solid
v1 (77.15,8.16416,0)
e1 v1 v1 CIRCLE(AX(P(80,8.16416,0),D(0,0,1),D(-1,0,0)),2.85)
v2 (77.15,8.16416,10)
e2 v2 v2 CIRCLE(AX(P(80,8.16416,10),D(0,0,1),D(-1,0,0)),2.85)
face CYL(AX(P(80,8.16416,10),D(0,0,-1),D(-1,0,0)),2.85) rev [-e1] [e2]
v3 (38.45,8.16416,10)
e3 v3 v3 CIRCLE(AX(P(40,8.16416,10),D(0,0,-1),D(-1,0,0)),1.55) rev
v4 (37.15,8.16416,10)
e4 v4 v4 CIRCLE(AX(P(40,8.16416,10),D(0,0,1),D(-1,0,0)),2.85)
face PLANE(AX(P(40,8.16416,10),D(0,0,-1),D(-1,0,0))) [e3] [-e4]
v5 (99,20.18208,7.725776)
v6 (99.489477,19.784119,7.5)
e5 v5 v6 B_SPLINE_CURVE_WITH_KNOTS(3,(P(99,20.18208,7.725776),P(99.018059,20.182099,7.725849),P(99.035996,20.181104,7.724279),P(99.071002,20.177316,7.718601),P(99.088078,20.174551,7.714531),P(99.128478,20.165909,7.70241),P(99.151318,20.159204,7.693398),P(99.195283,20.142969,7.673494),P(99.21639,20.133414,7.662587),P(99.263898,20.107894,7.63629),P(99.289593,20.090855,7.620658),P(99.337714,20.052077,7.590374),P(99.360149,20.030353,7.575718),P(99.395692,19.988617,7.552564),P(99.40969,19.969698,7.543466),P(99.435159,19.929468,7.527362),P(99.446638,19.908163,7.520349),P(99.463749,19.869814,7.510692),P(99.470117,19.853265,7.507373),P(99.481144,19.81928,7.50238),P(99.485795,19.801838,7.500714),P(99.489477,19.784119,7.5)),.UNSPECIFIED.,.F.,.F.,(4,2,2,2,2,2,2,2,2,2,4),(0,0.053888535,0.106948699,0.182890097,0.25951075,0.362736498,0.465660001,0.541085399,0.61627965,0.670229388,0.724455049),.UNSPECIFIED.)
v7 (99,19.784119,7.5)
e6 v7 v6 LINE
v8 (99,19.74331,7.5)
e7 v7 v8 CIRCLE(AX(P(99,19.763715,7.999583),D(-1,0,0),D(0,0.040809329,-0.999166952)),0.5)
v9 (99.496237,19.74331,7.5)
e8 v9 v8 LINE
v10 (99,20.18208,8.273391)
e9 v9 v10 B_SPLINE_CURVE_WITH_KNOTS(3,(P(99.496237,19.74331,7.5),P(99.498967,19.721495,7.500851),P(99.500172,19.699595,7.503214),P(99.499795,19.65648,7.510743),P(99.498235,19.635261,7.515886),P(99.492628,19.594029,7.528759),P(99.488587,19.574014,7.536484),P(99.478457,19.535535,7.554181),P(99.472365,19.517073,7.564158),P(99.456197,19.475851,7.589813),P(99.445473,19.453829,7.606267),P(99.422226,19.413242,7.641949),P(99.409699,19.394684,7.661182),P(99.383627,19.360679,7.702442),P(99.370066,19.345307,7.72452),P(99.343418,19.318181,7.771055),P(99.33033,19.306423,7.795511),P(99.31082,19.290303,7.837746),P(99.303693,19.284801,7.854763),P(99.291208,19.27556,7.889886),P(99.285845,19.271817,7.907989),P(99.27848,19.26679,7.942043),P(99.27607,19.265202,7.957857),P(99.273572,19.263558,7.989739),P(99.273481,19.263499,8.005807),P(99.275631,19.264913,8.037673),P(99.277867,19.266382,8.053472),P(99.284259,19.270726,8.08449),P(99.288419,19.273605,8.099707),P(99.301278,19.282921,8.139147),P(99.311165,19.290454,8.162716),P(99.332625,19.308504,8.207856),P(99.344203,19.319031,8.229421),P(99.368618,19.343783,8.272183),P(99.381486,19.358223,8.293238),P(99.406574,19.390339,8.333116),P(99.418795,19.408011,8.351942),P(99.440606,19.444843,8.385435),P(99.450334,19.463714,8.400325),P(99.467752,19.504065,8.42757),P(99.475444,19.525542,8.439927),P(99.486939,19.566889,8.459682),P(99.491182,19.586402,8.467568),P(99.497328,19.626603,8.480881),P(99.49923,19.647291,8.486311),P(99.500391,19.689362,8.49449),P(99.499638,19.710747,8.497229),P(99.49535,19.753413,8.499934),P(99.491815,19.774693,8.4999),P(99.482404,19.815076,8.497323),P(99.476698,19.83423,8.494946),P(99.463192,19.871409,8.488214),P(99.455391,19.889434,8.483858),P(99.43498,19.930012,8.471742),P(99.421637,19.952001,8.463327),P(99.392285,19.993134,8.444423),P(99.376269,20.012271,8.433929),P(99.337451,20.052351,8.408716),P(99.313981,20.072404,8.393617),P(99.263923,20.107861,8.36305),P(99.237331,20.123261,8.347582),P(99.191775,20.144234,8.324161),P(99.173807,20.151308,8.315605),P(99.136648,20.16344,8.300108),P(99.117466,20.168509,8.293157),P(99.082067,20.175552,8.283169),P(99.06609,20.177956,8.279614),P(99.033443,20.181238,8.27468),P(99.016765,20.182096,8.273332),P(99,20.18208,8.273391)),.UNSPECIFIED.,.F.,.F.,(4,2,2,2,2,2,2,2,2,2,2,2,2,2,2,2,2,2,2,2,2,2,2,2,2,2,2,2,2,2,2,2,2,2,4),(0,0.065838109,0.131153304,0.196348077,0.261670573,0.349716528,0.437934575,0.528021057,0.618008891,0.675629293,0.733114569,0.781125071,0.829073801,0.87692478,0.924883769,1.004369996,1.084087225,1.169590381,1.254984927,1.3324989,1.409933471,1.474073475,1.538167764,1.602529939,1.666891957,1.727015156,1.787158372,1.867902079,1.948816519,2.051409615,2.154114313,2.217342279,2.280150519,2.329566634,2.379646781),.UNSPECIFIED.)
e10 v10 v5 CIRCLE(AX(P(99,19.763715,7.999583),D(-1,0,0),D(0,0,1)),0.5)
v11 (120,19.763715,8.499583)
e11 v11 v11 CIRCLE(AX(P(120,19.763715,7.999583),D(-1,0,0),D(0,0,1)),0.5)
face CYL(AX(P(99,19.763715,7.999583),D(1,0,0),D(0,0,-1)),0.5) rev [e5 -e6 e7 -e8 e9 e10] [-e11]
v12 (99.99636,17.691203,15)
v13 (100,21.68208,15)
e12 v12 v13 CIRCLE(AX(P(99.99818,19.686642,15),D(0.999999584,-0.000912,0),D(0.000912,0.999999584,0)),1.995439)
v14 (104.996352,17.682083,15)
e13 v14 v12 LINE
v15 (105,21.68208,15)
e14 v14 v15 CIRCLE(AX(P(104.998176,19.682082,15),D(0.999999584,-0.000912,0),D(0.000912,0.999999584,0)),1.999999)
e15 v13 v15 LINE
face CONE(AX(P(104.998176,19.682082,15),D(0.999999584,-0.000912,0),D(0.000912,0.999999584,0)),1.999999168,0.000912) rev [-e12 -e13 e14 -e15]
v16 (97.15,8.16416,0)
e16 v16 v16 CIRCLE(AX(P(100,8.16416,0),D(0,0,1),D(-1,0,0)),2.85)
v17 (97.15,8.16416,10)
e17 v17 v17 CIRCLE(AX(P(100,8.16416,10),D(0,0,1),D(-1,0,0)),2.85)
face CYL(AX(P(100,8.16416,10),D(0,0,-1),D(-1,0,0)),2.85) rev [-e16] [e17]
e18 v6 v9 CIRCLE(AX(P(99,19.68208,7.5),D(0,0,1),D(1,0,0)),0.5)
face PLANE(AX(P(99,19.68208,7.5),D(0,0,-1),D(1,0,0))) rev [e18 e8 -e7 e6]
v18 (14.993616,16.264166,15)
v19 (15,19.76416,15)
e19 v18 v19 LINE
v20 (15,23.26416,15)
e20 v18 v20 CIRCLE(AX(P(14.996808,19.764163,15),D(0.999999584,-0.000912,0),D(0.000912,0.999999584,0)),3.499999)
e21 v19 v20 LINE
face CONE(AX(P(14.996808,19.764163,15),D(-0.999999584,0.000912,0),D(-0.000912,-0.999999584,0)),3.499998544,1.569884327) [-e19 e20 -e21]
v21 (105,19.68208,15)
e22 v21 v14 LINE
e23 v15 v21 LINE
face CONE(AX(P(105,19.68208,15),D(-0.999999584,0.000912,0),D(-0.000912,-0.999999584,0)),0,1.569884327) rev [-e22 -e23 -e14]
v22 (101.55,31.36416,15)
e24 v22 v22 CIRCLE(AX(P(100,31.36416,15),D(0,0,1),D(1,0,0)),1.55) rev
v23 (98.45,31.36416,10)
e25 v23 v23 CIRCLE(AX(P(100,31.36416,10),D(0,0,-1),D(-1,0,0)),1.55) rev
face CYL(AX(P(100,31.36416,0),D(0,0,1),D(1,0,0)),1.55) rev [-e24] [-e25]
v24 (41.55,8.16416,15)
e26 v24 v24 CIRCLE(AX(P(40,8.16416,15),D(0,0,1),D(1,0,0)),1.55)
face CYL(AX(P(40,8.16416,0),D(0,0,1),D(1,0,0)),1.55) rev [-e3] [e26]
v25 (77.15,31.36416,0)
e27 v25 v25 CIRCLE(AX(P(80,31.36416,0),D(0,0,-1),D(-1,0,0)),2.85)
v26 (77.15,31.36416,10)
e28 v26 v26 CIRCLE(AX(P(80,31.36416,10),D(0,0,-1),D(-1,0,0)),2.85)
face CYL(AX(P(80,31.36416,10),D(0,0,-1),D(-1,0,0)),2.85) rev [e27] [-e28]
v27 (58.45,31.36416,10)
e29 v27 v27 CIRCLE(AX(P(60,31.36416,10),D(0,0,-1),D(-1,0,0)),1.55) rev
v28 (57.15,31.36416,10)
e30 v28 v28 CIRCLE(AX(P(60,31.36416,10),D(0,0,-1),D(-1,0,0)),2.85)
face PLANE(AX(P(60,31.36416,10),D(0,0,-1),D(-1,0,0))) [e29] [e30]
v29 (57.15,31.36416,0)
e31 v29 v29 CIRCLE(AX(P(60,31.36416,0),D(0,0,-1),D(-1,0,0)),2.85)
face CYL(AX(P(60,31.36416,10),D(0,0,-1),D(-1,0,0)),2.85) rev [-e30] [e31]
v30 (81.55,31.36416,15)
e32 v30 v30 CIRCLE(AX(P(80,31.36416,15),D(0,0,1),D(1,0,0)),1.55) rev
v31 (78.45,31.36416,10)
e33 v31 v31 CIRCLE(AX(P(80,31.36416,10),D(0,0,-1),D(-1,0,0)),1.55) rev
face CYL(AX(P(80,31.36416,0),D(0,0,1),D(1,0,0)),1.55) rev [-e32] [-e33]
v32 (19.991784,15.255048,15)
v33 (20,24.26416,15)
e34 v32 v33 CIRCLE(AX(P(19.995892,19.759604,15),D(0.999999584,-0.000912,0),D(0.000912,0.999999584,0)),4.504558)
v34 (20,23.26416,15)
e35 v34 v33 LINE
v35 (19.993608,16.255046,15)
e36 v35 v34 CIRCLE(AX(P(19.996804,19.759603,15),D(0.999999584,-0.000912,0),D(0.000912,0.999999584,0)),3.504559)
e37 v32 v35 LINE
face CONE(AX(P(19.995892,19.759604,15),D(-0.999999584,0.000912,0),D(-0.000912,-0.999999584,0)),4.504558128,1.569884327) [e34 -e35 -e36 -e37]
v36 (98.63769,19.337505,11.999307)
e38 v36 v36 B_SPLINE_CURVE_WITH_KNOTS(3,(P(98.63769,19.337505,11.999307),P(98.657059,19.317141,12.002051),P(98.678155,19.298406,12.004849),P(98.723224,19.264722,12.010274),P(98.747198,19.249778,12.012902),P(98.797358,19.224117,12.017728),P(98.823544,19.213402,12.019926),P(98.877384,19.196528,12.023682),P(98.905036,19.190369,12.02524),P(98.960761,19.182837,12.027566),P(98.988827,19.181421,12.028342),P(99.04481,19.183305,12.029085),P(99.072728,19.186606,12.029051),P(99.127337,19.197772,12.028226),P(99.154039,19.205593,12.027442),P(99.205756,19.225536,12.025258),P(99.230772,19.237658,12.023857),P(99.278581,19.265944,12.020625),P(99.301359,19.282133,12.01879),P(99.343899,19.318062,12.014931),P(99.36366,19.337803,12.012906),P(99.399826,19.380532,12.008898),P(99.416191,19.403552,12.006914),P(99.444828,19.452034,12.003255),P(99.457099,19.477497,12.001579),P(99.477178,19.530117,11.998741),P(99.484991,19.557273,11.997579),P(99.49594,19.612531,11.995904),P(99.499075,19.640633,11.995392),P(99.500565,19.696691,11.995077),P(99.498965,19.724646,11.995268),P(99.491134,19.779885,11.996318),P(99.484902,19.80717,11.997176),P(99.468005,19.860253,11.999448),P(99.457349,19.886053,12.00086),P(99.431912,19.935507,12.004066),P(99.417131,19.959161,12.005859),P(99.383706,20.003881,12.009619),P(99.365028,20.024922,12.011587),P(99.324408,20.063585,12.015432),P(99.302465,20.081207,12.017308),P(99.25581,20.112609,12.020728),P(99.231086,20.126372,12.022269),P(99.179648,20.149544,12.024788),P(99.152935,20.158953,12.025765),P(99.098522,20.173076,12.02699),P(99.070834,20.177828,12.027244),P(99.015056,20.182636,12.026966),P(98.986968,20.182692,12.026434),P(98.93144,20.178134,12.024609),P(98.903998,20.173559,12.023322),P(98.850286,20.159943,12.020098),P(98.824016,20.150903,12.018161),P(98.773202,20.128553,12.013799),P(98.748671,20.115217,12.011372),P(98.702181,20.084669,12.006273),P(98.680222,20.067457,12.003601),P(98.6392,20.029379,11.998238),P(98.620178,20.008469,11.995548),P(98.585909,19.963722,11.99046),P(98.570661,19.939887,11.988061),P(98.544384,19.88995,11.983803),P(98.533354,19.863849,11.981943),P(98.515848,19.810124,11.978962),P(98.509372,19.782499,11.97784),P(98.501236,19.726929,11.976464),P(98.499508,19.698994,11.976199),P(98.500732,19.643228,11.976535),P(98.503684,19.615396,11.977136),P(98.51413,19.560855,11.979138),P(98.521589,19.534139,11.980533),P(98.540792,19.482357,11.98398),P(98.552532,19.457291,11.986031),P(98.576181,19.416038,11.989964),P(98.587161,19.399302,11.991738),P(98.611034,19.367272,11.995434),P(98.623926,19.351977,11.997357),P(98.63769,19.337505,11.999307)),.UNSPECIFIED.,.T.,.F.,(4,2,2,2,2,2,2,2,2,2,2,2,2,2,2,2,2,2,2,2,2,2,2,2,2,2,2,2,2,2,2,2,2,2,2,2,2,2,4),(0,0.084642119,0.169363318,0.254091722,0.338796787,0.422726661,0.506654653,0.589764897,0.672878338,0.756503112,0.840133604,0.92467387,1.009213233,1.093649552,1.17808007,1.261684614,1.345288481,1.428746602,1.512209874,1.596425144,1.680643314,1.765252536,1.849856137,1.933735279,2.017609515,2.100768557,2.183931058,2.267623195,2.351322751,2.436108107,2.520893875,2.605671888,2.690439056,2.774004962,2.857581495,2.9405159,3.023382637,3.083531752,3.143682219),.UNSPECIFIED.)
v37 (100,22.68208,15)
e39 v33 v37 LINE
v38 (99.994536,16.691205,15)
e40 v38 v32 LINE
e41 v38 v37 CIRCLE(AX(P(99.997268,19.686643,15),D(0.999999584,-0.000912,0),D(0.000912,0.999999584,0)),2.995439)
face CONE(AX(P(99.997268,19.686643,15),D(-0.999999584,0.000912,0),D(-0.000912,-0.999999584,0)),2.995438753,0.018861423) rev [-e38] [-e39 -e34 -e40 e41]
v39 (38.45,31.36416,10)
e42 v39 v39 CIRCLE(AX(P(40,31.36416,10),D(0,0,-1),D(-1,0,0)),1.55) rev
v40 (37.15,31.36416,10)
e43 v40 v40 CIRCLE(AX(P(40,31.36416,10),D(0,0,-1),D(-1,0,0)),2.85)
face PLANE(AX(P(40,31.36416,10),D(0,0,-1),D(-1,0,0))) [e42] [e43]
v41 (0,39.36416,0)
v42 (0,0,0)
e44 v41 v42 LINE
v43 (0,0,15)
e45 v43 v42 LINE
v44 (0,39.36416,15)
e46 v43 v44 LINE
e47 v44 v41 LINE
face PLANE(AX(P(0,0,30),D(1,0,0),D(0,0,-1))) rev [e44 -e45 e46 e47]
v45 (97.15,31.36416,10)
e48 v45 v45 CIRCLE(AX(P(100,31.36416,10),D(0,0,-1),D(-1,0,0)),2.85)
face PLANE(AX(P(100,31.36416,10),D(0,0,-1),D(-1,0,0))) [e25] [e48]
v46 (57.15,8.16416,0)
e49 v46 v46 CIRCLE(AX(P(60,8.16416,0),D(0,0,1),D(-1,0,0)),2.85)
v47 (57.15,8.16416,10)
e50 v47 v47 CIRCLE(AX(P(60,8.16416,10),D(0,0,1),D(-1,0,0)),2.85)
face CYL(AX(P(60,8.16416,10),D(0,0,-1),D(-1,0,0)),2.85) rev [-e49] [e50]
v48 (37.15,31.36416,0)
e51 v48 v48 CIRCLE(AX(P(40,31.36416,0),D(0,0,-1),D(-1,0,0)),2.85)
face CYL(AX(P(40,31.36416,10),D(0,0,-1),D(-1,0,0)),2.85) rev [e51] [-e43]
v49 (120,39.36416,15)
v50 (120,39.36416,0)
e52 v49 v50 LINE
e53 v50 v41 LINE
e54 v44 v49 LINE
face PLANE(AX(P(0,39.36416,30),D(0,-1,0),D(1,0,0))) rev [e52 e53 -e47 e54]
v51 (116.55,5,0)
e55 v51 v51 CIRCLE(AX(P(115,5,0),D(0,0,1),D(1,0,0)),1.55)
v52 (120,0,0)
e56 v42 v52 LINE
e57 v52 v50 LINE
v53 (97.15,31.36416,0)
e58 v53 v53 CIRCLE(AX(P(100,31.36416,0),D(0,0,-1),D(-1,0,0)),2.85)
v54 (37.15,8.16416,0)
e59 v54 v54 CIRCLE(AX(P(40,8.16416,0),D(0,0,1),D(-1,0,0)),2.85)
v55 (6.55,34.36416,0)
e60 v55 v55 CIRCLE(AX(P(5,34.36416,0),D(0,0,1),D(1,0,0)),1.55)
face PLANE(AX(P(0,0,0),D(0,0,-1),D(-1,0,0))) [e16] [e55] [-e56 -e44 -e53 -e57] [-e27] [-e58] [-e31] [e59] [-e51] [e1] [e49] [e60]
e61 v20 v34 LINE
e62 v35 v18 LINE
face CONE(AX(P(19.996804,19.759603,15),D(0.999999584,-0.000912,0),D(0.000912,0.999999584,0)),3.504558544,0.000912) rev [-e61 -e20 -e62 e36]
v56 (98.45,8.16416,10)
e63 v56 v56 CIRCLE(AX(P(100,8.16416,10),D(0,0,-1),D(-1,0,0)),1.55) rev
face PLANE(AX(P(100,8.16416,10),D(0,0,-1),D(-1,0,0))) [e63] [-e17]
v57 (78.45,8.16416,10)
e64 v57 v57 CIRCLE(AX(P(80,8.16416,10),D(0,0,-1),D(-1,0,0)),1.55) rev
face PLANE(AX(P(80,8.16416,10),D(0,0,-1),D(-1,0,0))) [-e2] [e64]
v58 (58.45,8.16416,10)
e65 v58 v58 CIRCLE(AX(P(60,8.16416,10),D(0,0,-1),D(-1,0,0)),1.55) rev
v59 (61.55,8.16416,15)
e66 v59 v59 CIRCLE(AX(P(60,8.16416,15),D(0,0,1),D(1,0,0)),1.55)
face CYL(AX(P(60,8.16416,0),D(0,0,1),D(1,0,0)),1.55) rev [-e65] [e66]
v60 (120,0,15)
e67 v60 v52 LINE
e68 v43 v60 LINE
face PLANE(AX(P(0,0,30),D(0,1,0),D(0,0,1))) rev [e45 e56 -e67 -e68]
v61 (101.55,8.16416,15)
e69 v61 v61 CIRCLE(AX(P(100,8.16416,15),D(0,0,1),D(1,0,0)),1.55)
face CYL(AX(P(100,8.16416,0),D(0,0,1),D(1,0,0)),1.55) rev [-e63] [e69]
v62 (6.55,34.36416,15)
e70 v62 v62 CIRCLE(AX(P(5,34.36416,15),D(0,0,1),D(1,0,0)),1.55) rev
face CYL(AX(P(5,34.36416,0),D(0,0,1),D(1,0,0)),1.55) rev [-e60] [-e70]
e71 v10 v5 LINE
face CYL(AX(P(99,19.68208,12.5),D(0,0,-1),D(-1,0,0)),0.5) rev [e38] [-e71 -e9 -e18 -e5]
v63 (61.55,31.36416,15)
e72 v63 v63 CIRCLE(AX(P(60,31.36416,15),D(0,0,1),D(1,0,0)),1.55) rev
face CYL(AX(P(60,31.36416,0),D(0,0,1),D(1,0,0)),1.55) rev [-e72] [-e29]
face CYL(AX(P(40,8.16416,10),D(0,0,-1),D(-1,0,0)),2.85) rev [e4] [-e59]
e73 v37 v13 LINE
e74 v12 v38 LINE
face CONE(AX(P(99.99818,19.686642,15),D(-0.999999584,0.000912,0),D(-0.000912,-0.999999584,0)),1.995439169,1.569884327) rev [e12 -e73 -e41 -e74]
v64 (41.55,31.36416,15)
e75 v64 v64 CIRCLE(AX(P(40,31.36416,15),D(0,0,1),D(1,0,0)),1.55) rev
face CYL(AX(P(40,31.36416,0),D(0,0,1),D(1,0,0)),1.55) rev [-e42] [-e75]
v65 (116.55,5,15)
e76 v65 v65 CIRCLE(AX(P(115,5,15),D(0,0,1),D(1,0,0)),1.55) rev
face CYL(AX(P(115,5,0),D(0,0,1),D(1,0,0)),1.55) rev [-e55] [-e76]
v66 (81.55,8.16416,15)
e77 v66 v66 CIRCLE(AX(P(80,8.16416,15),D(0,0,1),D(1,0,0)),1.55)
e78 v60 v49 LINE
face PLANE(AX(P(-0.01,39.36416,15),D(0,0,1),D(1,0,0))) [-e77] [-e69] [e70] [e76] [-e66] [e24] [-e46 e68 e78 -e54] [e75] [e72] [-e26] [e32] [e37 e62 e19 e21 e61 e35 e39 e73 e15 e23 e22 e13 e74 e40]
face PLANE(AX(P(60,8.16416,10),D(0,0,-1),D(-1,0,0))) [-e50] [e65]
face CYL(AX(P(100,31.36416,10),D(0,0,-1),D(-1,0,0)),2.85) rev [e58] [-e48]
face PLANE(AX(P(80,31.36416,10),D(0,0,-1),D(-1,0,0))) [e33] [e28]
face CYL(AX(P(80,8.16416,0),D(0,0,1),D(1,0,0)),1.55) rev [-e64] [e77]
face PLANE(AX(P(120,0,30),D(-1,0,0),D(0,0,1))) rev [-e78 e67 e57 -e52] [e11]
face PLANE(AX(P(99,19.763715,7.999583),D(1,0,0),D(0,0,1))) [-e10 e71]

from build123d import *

# Parameters (mm, degrees)
SKIZZE2_W                        = 120
SKIZZE2_H                        = 39.364160046
AUFSATZ_LINEAR_AUSTRAGEN1_DEPTH  = 30
SKIZZE24_R                       = 1.55
SCHNITT_LINEAR_AUSTRAGEN4_DEPTH  = 130.805766806
SKIZZE46_R                       = 2.85
SCHNITT_LINEAR_AUSTRAGEN15_DEPTH = 10
SCHNITT_LINEAR_START             = -5
SCHNITT_LINEAR_AUSTRAGEN25_DEPTH = 2.7
LINEARES_MUSTER1_COUNT           = 4
LINEARES_MUSTER1_PITCH           = 20
SPIEGELN2_COPY_1_SKETCH_R        = 2.85
SPIEGELN2_COPY_1_DEPTH           = 10
SPIEGELN2_COPY_2_SKETCH_R        = 2.85
SPIEGELN2_COPY_2_DEPTH           = 10
SPIEGELN2_COPY_3_SKETCH_R        = 2.85
SPIEGELN2_COPY_3_DEPTH           = 10
SPIEGELN2_START                  = -5
SPIEGELN2_COPY_4_DEPTH           = 2.7
SPIEGELN2_COPY_5_DEPTH           = 2.7
SPIEGELN2_COPY_6_DEPTH           = 2.7
SKIZZE51_R                       = 1.55
SCHNITT_LINEAR_AUSTRAGEN26_DEPTH = 130.805766806
SKIZZE75_R                       = 0.75
SCHNITT_LINEAR_AUSTRAGEN28_DEPTH = 10
SKIZZE76_R                       = 2
SCHNITT_LINEAR_AUSTRAGEN29_DEPTH = 6
SKIZZE80_R                       = 0.5
SCHNITT_LINEAR_AUSTRAGEN34_DEPTH = 21
SCHNITT_LINEAR_START_2           = -7.5
SKIZZE81_R                       = 0.5
SCHNITT_LINEAR_AUSTRAGEN36_DEPTH = 5
ABSPALTEN3_START                 = 15
ABSPALTEN3_OUTLINE_W             = 120
ABSPALTEN3_OUTLINE_H             = 39.364160046
ABSPALTEN3_OUTLINE_R             = 1.55
ABSPALTEN3_DEPTH                 = 15


# Read off the part's stored shape, not the designer's step: Abspalten3
with BuildPart() as part:
    # Skizze2 → Aufsatz-Linear austragen1 (new body)
    with BuildSketch(Plane.XY):
        with Locations((60, 19.682080023)):
            Rectangle(SKIZZE2_W, SKIZZE2_H)
    extrude(amount=AUFSATZ_LINEAR_AUSTRAGEN1_DEPTH)

    # Skizze24 → Schnitt-Linear austragen4 (cut, through all)
    with BuildSketch(Plane.XY.offset(30)):
        with Locations((40, 31.364160046)):
            Circle(SKIZZE24_R)
        with Locations((60, 31.364160046)):
            Circle(SKIZZE24_R)
        with Locations((80, 31.364160046)):
            Circle(SKIZZE24_R)
        with Locations((100, 31.364160046)):
            Circle(SKIZZE24_R)
    schnitt_linear_austragen4 = extrude(amount=-SCHNITT_LINEAR_AUSTRAGEN4_DEPTH, mode=Mode.SUBTRACT)

    # Skizze46 → Schnitt-Linear austragen15 (cut)
    with BuildSketch(Plane(origin=(0, 0, 0), x_dir=(-1, 0, 0), z_dir=(0, 0, -1))):
        with Locations((-100, 31.364160046)):
            Circle(SKIZZE46_R)
    schnitt_linear_austragen15 = extrude(amount=-SCHNITT_LINEAR_AUSTRAGEN15_DEPTH, mode=Mode.SUBTRACT)

    # Skizze50 → Schnitt-Linear austragen25 (cut)
    with BuildSketch(Plane.XY.offset(30).offset(SCHNITT_LINEAR_START)):
        Polygon((97.15, 33.009608314), (97.15, 39.364160046), (102.85, 39.364160046), (102.85, 33.009608314), (102.85, 29.718711779), (100, 28.073263512), (97.15, 29.718711779), align=None)
    schnitt_linear_austragen25 = extrude(amount=-SCHNITT_LINEAR_AUSTRAGEN25_DEPTH, mode=Mode.SUBTRACT)

    # Lineares Muster1: Schnitt-Linear austragen15, Schnitt-Linear austragen25 ×4
    with Locations(*[(-i * LINEARES_MUSTER1_PITCH, 0, 0) for i in range(1, LINEARES_MUSTER1_COUNT)]):
        add(schnitt_linear_austragen15, mode=Mode.SUBTRACT)
        add(schnitt_linear_austragen25, mode=Mode.SUBTRACT)

    # Spiegeln2: Schnitt-Linear austragen15, Schnitt-Linear austragen25 across plane
    add(schnitt_linear_austragen15.mirror(Plane.ZX.offset(19.764160046)), mode=Mode.SUBTRACT)
    add(schnitt_linear_austragen25.mirror(Plane.ZX.offset(19.764160046)), mode=Mode.SUBTRACT)

    # Spiegeln2 copy 1 sketch → Spiegeln2 copy 1 (cut)
    with BuildSketch(Plane(origin=(-20, 39.528320093, 0), x_dir=(-1, 0, 0), z_dir=(0, 0, -1))):
        with Locations((-100, -31.364160046)):
            Circle(SPIEGELN2_COPY_1_SKETCH_R)
    extrude(amount=-SPIEGELN2_COPY_1_DEPTH, mode=Mode.SUBTRACT)

    # Spiegeln2 copy 2 sketch → Spiegeln2 copy 2 (cut)
    with BuildSketch(Plane(origin=(-40, 39.528320093, 0), x_dir=(-1, 0, 0), z_dir=(0, 0, -1))):
        with Locations((-100, -31.364160046)):
            Circle(SPIEGELN2_COPY_2_SKETCH_R)
    extrude(amount=-SPIEGELN2_COPY_2_DEPTH, mode=Mode.SUBTRACT)

    # Spiegeln2 copy 3 sketch → Spiegeln2 copy 3 (cut)
    with BuildSketch(Plane(origin=(-60, 39.528320093, 0), x_dir=(-1, 0, 0), z_dir=(0, 0, -1))):
        with Locations((-100, -31.364160046)):
            Circle(SPIEGELN2_COPY_3_SKETCH_R)
    extrude(amount=-SPIEGELN2_COPY_3_DEPTH, mode=Mode.SUBTRACT)

    # Spiegeln2 copy 4 sketch → Spiegeln2 copy 4 (cut)
    with BuildSketch(Plane(origin=(-20, 39.528320093, 30), x_dir=(1, 0, 0), z_dir=(0, 0, 1)).offset(SPIEGELN2_START)):
        Polygon((97.15, -33.009608314), (97.15, -39.364160046), (102.85, -39.364160046), (102.85, -33.009608314), (102.85, -29.718711779), (100, -28.073263512), (97.15, -29.718711779), align=None)
    extrude(amount=-SPIEGELN2_COPY_4_DEPTH, mode=Mode.SUBTRACT)

    # Spiegeln2 copy 5 sketch → Spiegeln2 copy 5 (cut)
    with BuildSketch(Plane(origin=(-40, 39.528320093, 30), x_dir=(1, 0, 0), z_dir=(0, 0, 1)).offset(SPIEGELN2_START)):
        Polygon((97.15, -33.009608314), (97.15, -39.364160046), (102.85, -39.364160046), (102.85, -33.009608314), (102.85, -29.718711779), (100, -28.073263512), (97.15, -29.718711779), align=None)
    extrude(amount=-SPIEGELN2_COPY_5_DEPTH, mode=Mode.SUBTRACT)

    # Spiegeln2 copy 6 sketch → Spiegeln2 copy 6 (cut)
    with BuildSketch(Plane(origin=(-60, 39.528320093, 30), x_dir=(1, 0, 0), z_dir=(0, 0, 1)).offset(SPIEGELN2_START)):
        Polygon((97.15, -33.009608314), (97.15, -39.364160046), (102.85, -39.364160046), (102.85, -33.009608314), (102.85, -29.718711779), (100, -28.073263512), (97.15, -29.718711779), align=None)
    extrude(amount=-SPIEGELN2_COPY_6_DEPTH, mode=Mode.SUBTRACT)

    # Spiegeln3: Schnitt-Linear austragen4 across plane
    add(schnitt_linear_austragen4.mirror(Plane.ZX.offset(19.764160046)), mode=Mode.SUBTRACT)

    # Skizze51 → Schnitt-Linear austragen26 (cut, through all)
    with BuildSketch(Plane.XY.offset(30)):
        with Locations((5, 34.364160046)):
            Circle(SKIZZE51_R)
        with Locations((115, 5)):
            Circle(SKIZZE51_R)
    extrude(amount=-SCHNITT_LINEAR_AUSTRAGEN26_DEPTH, mode=Mode.SUBTRACT)

    # Skizze73 → Schnitt-Rotation5 (revolve, cut)
    with BuildSketch(Plane.XY.offset(15)):
        Polygon((15, 19.764160046), (15, 23.264160046), (20, 23.264160046), (20, 24.264160046), (100, 22.682080023), (100, 21.682080023), (105, 21.682080023), (105, 19.682080023), align=None)
    revolve(axis=Axis((105, 19.682080023, 15), (-0.9999995841280241, 0.0009119998787298228, 0)), mode=Mode.SUBTRACT)

    # Skizze75 → Schnitt-Linear austragen28 (cut)
    with BuildSketch(Plane.XY.offset(30)):
        with Locations((21.598259807, 19.682080023)):
            Circle(SKIZZE75_R)
    extrude(amount=-SCHNITT_LINEAR_AUSTRAGEN28_DEPTH, mode=Mode.SUBTRACT)

    # Skizze76 → Schnitt-Linear austragen29 (cut)
    with BuildSketch(Plane.XY.offset(30)):
        with Locations((21.598259807, 19.682080023)):
            Circle(SKIZZE76_R)
    extrude(amount=-SCHNITT_LINEAR_AUSTRAGEN29_DEPTH, mode=Mode.SUBTRACT)

    # Skizze80 → Schnitt-Linear austragen34 (cut)
    with BuildSketch(Plane(origin=(120, 0, 0), x_dir=(0, 0, -1), z_dir=(1, 0, 0))):
        with Locations((-22.000416524, 19.763714623)):
            Circle(SKIZZE80_R)
    schnitt_linear_austragen34 = extrude(amount=-SCHNITT_LINEAR_AUSTRAGEN34_DEPTH, mode=Mode.SUBTRACT)

    # Skizze81 → Schnitt-Linear austragen36 (cut)
    with BuildSketch(Plane.XY.offset(30).offset(SCHNITT_LINEAR_START_2)):
        with Locations(Location((99, 19.682080023, 0), (0, 0, 7.034090001))):
            Circle(SKIZZE81_R)
    schnitt_linear_austragen36 = extrude(amount=-SCHNITT_LINEAR_AUSTRAGEN36_DEPTH, mode=Mode.SUBTRACT)

    # Spiegeln4: Schnitt-Linear austragen34, Schnitt-Linear austragen36 across plane
    add(schnitt_linear_austragen34.mirror(Plane.XY.offset(15)), mode=Mode.SUBTRACT)
    add(schnitt_linear_austragen36.mirror(Plane.XY.offset(15)), mode=Mode.SUBTRACT)

    # Abspalten3 outline → Abspalten3 (cut)
    with BuildSketch(Plane.XY.offset(ABSPALTEN3_START)):
        with Locations((60, 19.682080023)):
            Rectangle(ABSPALTEN3_OUTLINE_W, ABSPALTEN3_OUTLINE_H)
        with Locations((115, 5)):
            Circle(ABSPALTEN3_OUTLINE_R, mode=Mode.SUBTRACT)
        with Locations((5, 34.364160046)):
            Circle(ABSPALTEN3_OUTLINE_R, mode=Mode.SUBTRACT)
        with Locations((40, 31.364160046)):
            Circle(ABSPALTEN3_OUTLINE_R, mode=Mode.SUBTRACT)
        with Locations((60, 31.364160046)):
            Circle(ABSPALTEN3_OUTLINE_R, mode=Mode.SUBTRACT)
        with Locations((80, 31.364160046)):
            Circle(ABSPALTEN3_OUTLINE_R, mode=Mode.SUBTRACT)
        with Locations((100, 31.364160046)):
            Circle(ABSPALTEN3_OUTLINE_R, mode=Mode.SUBTRACT)
        with Locations((40, 8.164160046)):
            Circle(ABSPALTEN3_OUTLINE_R, mode=Mode.SUBTRACT)
        with Locations((60, 8.164160046)):
            Circle(ABSPALTEN3_OUTLINE_R, mode=Mode.SUBTRACT)
        with Locations((80, 8.164160046)):
            Circle(ABSPALTEN3_OUTLINE_R, mode=Mode.SUBTRACT)
        with Locations((100, 8.164160046)):
            Circle(ABSPALTEN3_OUTLINE_R, mode=Mode.SUBTRACT)
    extrude(amount=ABSPALTEN3_DEPTH, mode=Mode.SUBTRACT)


solid = part.part
